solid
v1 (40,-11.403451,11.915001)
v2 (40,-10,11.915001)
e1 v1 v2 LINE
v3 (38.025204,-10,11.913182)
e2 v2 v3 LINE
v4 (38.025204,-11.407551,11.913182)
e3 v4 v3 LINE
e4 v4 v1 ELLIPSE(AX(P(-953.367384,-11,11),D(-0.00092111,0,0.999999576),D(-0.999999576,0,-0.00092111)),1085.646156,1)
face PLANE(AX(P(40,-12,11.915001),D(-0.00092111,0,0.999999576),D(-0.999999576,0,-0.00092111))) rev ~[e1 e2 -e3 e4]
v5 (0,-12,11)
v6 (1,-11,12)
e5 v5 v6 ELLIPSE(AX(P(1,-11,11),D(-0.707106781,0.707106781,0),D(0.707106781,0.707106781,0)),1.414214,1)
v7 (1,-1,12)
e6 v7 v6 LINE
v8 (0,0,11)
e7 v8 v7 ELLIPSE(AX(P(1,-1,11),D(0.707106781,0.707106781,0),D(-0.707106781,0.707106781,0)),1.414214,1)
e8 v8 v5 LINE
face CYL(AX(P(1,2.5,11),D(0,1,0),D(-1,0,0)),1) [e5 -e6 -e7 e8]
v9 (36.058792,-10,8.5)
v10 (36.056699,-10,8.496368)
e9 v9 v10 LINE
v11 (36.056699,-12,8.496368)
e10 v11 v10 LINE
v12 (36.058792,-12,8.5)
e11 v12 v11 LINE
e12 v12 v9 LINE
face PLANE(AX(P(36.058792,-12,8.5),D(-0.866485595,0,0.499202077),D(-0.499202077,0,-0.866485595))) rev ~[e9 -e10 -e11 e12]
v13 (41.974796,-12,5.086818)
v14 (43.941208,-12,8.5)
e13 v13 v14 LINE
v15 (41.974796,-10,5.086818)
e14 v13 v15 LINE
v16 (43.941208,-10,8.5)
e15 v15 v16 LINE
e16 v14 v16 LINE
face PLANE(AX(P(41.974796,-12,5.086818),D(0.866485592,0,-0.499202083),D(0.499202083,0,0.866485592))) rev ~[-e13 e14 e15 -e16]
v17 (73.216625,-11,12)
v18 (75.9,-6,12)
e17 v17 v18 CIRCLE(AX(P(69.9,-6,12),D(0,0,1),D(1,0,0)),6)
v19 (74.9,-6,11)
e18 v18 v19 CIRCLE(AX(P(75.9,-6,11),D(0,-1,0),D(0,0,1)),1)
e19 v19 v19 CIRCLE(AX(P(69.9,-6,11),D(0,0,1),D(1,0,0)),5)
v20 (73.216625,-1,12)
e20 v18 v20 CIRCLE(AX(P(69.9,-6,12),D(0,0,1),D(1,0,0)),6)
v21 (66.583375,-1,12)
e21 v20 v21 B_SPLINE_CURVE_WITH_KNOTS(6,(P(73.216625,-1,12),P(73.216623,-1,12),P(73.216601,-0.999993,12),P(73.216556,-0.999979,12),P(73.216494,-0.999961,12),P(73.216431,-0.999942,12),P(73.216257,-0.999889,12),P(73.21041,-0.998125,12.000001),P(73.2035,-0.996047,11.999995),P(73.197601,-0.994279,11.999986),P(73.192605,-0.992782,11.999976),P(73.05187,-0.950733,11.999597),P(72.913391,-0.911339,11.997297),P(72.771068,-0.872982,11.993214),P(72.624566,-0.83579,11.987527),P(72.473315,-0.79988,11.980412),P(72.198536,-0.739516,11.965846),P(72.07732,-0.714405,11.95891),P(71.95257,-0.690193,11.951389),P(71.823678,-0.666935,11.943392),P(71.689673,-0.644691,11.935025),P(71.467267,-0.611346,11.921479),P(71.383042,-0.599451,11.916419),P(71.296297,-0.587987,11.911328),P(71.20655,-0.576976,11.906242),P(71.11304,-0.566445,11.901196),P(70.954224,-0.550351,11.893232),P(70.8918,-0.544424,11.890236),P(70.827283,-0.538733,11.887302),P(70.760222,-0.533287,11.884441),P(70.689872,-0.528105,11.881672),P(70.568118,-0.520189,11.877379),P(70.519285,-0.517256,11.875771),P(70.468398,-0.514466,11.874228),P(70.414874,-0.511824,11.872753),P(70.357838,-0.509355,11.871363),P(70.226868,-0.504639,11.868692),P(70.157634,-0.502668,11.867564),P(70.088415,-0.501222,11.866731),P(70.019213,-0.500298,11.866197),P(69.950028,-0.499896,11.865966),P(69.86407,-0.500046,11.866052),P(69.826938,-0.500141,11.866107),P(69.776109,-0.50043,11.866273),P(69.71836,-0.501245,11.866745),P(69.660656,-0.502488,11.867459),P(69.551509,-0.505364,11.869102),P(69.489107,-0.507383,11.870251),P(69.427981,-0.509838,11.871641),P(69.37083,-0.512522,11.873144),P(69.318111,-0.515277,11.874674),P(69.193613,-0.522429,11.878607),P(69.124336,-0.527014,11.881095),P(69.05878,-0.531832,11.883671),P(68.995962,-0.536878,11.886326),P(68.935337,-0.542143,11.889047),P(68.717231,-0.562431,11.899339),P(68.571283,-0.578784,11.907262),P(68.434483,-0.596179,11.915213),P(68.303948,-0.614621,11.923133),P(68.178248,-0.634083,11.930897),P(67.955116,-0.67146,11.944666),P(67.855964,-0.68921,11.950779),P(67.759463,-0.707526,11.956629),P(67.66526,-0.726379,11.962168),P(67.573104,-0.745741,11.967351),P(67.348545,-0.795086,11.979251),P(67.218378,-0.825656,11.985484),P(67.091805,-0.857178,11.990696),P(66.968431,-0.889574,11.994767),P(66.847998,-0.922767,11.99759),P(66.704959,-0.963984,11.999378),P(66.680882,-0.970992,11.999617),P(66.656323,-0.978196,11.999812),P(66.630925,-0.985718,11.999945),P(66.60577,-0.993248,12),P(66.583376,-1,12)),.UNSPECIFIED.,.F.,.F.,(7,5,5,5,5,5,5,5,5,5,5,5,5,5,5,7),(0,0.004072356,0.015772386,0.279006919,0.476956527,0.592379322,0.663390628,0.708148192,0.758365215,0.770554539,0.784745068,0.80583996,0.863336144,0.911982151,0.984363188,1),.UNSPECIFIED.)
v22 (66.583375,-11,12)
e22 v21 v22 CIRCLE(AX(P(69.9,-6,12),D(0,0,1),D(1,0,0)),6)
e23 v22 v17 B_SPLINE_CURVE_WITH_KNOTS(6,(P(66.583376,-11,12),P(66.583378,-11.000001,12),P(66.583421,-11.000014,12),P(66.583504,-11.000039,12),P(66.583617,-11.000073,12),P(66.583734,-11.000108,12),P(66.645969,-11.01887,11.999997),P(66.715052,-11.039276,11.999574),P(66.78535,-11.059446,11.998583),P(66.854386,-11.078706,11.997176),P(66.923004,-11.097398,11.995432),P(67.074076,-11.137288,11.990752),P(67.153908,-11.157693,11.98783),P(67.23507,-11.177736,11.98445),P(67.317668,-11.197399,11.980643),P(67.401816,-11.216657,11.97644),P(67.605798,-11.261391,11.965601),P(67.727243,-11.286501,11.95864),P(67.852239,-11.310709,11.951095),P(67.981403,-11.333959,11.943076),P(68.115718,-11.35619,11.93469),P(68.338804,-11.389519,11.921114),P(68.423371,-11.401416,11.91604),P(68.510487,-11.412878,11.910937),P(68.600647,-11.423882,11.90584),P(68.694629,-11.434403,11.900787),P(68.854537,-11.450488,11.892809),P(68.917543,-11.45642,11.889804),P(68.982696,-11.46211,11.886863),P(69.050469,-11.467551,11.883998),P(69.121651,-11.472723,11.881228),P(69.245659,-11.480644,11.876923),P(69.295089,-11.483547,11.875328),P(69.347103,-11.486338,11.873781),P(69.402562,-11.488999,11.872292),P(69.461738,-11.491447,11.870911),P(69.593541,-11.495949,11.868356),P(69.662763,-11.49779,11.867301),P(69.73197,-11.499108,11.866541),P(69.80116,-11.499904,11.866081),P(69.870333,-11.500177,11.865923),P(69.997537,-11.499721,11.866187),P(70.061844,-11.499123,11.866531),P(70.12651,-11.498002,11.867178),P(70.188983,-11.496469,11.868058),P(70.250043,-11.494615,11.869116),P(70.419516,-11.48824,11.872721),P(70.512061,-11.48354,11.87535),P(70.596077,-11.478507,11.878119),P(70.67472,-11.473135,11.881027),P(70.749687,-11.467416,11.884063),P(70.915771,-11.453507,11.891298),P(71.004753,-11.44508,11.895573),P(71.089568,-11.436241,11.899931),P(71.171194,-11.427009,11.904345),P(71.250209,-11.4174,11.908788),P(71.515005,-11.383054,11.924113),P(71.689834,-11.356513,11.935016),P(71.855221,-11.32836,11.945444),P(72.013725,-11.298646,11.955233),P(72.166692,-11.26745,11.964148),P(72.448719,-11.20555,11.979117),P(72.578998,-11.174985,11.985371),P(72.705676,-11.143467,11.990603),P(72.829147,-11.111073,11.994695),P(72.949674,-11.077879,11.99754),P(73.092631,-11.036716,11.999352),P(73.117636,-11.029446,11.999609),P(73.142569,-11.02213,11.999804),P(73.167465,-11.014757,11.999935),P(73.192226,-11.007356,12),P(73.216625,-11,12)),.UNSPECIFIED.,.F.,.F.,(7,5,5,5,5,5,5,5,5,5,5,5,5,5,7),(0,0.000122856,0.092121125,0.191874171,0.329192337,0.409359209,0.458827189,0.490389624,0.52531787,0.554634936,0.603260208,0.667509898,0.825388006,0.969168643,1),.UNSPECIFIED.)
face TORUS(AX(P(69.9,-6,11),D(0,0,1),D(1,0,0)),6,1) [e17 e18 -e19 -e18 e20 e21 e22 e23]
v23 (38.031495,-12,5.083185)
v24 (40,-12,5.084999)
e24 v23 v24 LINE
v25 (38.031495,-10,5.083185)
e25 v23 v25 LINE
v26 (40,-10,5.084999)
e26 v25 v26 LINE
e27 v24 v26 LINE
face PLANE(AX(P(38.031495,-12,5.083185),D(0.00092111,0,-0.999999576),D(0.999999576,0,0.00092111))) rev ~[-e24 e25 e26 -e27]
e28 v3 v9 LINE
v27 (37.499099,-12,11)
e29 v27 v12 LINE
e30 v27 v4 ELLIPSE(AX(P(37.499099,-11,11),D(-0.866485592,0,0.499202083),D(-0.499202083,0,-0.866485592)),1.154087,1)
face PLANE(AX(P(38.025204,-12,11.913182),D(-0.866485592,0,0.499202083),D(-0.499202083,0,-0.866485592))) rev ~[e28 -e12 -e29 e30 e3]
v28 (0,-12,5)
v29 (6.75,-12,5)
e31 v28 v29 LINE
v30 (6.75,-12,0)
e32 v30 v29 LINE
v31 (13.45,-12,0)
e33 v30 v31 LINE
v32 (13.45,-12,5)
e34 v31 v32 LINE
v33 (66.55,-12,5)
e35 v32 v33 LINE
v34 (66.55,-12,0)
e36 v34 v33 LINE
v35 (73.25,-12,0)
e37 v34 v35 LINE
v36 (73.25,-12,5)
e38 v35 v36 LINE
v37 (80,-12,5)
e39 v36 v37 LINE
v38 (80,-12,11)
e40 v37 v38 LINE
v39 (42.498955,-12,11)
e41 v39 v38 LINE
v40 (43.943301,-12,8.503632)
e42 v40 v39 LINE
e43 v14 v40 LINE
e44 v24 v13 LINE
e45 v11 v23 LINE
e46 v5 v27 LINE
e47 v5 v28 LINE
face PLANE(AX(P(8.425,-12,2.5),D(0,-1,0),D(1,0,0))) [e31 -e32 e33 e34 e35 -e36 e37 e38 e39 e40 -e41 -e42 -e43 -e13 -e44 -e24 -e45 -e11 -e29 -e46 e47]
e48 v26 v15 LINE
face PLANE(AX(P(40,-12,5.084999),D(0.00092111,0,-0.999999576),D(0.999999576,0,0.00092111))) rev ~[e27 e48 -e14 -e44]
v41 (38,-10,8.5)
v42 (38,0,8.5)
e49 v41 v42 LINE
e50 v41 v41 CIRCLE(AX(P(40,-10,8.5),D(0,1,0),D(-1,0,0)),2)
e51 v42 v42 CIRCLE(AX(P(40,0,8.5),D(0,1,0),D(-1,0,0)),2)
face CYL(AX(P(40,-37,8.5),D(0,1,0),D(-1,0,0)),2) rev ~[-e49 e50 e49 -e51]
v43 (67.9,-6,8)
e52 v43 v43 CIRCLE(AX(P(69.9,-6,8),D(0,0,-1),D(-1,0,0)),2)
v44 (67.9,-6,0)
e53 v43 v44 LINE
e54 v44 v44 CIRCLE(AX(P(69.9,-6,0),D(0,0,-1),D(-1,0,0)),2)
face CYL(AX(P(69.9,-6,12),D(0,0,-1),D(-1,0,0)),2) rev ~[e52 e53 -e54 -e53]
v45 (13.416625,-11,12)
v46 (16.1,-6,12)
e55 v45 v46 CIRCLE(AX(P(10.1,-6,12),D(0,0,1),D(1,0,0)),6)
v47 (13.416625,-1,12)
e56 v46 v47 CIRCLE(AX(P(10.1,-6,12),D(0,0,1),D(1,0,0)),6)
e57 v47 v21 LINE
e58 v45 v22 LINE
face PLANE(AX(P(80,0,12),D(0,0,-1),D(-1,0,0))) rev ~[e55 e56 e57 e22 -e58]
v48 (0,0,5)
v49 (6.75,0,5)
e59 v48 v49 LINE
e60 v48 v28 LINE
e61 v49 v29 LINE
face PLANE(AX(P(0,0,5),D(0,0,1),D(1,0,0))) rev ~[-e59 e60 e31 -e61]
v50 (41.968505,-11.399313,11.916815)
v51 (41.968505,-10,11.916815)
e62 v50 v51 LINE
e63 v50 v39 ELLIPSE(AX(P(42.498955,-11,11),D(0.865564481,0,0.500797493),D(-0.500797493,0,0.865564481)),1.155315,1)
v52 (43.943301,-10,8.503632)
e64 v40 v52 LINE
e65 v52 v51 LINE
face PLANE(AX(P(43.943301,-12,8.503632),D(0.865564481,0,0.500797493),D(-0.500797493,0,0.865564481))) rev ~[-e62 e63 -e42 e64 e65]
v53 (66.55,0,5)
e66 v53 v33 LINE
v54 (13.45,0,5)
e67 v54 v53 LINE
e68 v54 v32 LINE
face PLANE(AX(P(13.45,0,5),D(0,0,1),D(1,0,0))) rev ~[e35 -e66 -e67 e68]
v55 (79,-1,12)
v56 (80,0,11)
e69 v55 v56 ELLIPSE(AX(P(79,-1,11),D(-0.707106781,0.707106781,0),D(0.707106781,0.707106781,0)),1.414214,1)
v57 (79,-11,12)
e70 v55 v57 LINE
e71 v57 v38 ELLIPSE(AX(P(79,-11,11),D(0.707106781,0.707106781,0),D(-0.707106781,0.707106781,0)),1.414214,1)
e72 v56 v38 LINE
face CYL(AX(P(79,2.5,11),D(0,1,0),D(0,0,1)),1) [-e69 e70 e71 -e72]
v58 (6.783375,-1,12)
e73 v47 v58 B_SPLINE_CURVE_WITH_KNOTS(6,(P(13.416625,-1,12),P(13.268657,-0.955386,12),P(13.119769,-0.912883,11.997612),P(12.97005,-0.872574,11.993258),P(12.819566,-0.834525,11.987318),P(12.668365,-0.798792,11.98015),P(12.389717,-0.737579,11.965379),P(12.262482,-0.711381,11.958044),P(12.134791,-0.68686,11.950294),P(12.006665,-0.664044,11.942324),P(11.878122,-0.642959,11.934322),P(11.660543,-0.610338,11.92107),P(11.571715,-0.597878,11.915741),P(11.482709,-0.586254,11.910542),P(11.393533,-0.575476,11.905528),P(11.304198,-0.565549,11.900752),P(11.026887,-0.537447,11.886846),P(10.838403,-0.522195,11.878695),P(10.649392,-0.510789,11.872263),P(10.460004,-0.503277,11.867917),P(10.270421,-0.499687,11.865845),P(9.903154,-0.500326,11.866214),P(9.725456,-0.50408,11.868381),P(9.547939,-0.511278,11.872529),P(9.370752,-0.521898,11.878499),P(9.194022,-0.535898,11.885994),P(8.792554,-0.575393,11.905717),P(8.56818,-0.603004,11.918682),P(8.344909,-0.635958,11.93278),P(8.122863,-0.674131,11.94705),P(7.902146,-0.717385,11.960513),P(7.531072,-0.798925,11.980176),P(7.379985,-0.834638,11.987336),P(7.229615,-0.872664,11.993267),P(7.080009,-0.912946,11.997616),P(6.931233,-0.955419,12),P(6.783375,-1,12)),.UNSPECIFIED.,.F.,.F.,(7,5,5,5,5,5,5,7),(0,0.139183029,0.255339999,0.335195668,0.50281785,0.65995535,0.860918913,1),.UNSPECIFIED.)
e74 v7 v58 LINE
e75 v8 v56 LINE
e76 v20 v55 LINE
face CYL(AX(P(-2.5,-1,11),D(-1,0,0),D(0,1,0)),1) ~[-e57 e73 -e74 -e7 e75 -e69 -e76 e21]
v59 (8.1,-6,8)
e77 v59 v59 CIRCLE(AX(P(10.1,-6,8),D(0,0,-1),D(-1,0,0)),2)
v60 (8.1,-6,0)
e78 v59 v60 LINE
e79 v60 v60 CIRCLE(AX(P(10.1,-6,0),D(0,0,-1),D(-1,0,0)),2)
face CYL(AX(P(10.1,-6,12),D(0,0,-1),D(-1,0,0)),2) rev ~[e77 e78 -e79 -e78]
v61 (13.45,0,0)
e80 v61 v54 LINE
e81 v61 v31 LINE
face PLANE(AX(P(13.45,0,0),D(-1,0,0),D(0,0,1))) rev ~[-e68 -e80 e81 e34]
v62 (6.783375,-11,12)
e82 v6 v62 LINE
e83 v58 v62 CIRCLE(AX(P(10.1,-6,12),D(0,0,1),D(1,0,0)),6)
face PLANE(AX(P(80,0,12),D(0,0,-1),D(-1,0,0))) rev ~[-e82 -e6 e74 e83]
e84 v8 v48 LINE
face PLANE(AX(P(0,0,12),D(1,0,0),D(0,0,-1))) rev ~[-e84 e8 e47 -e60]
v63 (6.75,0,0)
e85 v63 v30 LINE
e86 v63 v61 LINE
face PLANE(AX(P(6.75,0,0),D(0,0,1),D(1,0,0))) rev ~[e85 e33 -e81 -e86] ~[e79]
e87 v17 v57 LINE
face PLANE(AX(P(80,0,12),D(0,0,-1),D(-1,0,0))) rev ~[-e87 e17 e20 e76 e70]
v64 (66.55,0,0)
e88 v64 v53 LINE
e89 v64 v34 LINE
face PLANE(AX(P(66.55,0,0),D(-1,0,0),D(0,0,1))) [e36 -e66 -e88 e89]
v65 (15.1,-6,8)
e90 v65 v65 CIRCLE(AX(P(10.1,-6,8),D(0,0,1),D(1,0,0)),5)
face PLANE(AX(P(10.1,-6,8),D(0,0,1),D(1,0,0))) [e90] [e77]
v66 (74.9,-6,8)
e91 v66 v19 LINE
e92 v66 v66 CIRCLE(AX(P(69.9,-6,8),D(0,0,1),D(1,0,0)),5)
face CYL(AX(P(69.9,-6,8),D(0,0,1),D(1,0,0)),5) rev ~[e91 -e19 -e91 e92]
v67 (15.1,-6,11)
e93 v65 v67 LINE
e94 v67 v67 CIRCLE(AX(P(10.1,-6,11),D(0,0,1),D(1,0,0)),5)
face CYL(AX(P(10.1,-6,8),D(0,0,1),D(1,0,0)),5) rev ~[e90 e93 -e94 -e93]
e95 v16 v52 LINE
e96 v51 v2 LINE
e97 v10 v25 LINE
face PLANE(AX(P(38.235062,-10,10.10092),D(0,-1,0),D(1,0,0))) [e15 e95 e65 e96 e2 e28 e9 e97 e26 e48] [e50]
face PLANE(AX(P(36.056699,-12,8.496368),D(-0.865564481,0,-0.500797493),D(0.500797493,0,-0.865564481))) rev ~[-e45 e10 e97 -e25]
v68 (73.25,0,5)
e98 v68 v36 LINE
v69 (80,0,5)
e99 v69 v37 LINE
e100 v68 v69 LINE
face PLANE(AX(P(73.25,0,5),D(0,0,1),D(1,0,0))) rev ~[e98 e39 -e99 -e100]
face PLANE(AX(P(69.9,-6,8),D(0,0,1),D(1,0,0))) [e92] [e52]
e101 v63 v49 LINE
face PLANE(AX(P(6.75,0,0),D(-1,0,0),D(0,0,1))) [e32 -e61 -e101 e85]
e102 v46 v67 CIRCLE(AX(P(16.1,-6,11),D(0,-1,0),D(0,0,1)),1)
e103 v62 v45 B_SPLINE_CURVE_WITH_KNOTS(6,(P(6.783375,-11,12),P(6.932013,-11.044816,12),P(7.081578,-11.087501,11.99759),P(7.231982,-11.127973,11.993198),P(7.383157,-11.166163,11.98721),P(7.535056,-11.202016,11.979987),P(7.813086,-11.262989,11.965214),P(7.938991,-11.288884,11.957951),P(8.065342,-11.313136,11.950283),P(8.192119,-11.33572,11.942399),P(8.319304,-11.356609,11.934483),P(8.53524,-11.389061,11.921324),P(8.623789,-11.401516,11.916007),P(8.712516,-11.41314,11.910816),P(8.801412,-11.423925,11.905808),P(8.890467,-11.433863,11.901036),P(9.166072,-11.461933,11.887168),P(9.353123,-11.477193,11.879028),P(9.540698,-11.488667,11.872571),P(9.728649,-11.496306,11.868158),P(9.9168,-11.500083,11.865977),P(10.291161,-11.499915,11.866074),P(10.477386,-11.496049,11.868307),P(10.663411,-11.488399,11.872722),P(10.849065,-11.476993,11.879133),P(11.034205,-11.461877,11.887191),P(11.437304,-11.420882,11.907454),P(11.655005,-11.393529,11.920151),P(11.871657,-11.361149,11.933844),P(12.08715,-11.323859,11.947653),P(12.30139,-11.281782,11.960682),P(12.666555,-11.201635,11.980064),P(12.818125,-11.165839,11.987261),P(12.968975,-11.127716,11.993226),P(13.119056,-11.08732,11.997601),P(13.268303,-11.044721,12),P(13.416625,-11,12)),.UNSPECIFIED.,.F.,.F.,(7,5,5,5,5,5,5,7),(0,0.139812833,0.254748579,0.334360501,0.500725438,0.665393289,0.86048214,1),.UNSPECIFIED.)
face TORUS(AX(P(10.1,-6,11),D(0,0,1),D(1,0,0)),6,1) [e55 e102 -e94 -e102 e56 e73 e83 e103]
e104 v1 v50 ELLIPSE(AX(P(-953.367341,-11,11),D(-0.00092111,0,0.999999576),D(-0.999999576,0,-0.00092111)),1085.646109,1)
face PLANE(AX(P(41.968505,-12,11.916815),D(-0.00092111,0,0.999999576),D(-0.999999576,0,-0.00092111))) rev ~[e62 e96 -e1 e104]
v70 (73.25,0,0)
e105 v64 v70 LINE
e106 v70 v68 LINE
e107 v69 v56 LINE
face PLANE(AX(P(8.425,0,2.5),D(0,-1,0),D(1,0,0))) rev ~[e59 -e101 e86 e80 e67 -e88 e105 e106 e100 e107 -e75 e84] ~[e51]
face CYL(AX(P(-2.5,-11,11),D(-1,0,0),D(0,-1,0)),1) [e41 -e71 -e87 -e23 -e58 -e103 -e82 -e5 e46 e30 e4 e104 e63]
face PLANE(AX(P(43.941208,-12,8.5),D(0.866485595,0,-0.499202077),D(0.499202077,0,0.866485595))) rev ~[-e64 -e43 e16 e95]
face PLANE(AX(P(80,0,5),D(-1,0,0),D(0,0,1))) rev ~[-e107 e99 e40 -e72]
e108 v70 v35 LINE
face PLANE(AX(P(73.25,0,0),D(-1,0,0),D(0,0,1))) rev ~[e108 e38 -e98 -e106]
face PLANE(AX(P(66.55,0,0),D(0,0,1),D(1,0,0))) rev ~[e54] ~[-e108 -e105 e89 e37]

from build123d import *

# Parameters (mm, degrees)
F0_W           = 3.35
F0_H           = 5
F1_DEPTH       = 12
F3_D           = 4
F3_DEPTH       = 25
F3_CBORE_D     = 10
F3_CBORE_DEPTH = 4
F3_TIP         = 1.2017212381
F5_D           = 4
F5_DEPTH       = 25
F5_TIP         = 1.2017212381
F6_DEPTH       = 2
F7_T1_DEPTH    = 17
F7_T3_DEPTH    = 85


# Not quite as in the source:
# - a fillet or chamfer that OpenCascade refuses, or shapes differently, is made with other operations: its cross-section is extruded or revolved along the edge and cut away or added


with BuildPart() as f1:
    # F0 (on Front) → F1 (new body)
    with BuildSketch(Plane.XZ):
        with Locations((8.425, 2.5)):
            Rectangle(F0_W, F0_H)
        with Locations((11.775, 2.5)):
            Rectangle(F0_W, F0_H)
        Polygon((0, 5), (6.75, 5), (10.1, 5), (10.1, 12), (0, 12), align=None)
        Polygon((10.1, 12), (10.1, 5), (13.45, 5), (66.55, 5), (69.9, 5), (69.9, 12), align=None)
        with Locations((68.225, 2.5)):
            Rectangle(F0_W, F0_H)
        Polygon((80, 12), (69.9, 12), (69.9, 5), (73.25, 5), (80, 5), align=None)
        with Locations((71.575, 2.5)):
            Rectangle(F0_W, F0_H)
    extrude(amount=F1_DEPTH)

    # F3
    with Locations(Plane.XY.offset(12)):
        with Locations((10.1, -6), (69.9, -6)):
            CounterBoreHole(F3_D / 2, F3_CBORE_D / 2, F3_CBORE_DEPTH, depth=F3_DEPTH)
            with Locations((0, 0, -(F3_DEPTH + F3_TIP / 2))):  # 118° drill point
                Cone(0, F3_D / 2, F3_TIP, mode=Mode.SUBTRACT)

    # F5
    with Locations(Plane.XZ.offset(12)):
        with Locations((40, 8.5)):
            Hole(F5_D / 2, depth=F5_DEPTH)
            with Locations((0, 0, -(F5_DEPTH + F5_TIP / 2))):  # 118° drill point
                Cone(0, F5_D / 2, F5_TIP, mode=Mode.SUBTRACT)

    # F4 (on face) → F6 (cut)
    with BuildSketch(Plane.XZ.offset(12)):
        with BuildLine():
            Line((38.0252040749, 11.9131824428), (36.0587919372, 8.5))
            Line((36.0587919372, 8.5), (38.5835167795, 8.5))
            ThreePointArc((38.5835167795, 8.5), (38.9983951094, 9.5016048906), (40, 9.9164832205))
            Line((40, 9.9164832205), (40, 11.9150014487))
            Line((40, 11.9150014487), (38.0252040749, 11.9131824428))
        make_face()
        with BuildLine():
            Line((38.5835167795, 8.5), (36.0587919372, 8.5))
            Line((36.0587919372, 8.5), (36.0566993343, 8.496367783))
            Line((36.0566993343, 8.496367783), (38.0314952594, 5.0831853402))
            Line((38.0314952594, 5.0831853402), (40, 5.0849985513))
            Line((40, 5.0849985513), (40, 7.0835167795))
            ThreePointArc((40, 7.0835167795), (38.9983951094, 7.4983951094), (38.5835167795, 8.5))
        make_face()
        with BuildLine():
            Line((40, 11.9150014487), (40, 9.9164832205))
            ThreePointArc((40, 9.9164832205), (41.0016048906, 9.5016048906), (41.4164832205, 8.5))
            Line((41.4164832205, 8.5), (43.9412080628, 8.5))
            Line((43.9412080628, 8.5), (43.9433006657, 8.503632217))
            Line((43.9433006657, 8.503632217), (41.9685047406, 11.9168146598))
            Line((41.9685047406, 11.9168146598), (40, 11.9150014487))
        make_face()
        with BuildLine():
            ThreePointArc((41.4164832205, 8.5), (41.0016048906, 7.4983951094), (40, 7.0835167795))
            Line((40, 7.0835167795), (40, 5.0849985513))
            Line((40, 5.0849985513), (41.9747959251, 5.0868175572))
            Line((41.9747959251, 5.0868175572), (43.9412080628, 8.5))
            Line((43.9412080628, 8.5), (41.4164832205, 8.5))
        make_face()
    extrude(amount=-F6_DEPTH, mode=Mode.SUBTRACT)

    # F7: fillet of radius 1 on 6 edges, made by hand

    # F7_s2 → F7_t1 (cut)
    with BuildSketch(Plane.XZ.offset(-2.5)):
        with BuildLine():
            ThreePointArc((79, 12), (79.7071067812, 11.7071067812), (80, 11))
            Line((80, 11), (80, 12))
            Line((80, 12), (79, 12))
        make_face()
        with BuildLine():
            ThreePointArc((0, 11), (0.2928932188, 11.7071067812), (1, 12))
            Line((1, 12), (0, 12))
            Line((0, 12), (0, 11))
        make_face()
    extrude(amount=F7_T1_DEPTH, mode=Mode.SUBTRACT)

    # F7_s4 → F7_t3 (cut)
    with BuildSketch(Plane.YZ.offset(-2.5)):
        with BuildLine():
            ThreePointArc((0, 11), (-0.2928932188, 11.7071067812), (-1, 12))
            Line((-1, 12), (0, 12))
            Line((0, 12), (0, 11))
        make_face()
        with BuildLine():
            ThreePointArc((-12, 11), (-11.7071067812, 11.7071067812), (-11, 12))
            Line((-11, 12), (-12, 12))
            Line((-12, 12), (-12, 11))
        make_face()
    extrude(amount=F7_T3_DEPTH, mode=Mode.SUBTRACT)

    # F7_s5 → F7_t6 (revolve, cut)
    with BuildSketch(Plane.XZ.offset(6)):
        with BuildLine():
            ThreePointArc((75.9, 12), (75.1928932188, 11.7071067812), (74.9, 11))
            Line((74.9, 11), (74.9, 12))
            Line((74.9, 12), (75.9, 12))
        make_face()
    revolve(axis=Axis((69.9, -6, 12), (0, 0, 1)), mode=Mode.SUBTRACT)

    # F7_s7 → F7_t8 (revolve, cut)
    with BuildSketch(Plane.XZ.offset(6)):
        with BuildLine():
            ThreePointArc((16.1, 12), (15.3928932188, 11.7071067812), (15.1, 11))
            Line((15.1, 11), (15.1, 12))
            Line((15.1, 12), (16.1, 12))
        make_face()
    revolve(axis=Axis((10.1, -6, 12), (0, 0, 1)), mode=Mode.SUBTRACT)


solid = f1.part
